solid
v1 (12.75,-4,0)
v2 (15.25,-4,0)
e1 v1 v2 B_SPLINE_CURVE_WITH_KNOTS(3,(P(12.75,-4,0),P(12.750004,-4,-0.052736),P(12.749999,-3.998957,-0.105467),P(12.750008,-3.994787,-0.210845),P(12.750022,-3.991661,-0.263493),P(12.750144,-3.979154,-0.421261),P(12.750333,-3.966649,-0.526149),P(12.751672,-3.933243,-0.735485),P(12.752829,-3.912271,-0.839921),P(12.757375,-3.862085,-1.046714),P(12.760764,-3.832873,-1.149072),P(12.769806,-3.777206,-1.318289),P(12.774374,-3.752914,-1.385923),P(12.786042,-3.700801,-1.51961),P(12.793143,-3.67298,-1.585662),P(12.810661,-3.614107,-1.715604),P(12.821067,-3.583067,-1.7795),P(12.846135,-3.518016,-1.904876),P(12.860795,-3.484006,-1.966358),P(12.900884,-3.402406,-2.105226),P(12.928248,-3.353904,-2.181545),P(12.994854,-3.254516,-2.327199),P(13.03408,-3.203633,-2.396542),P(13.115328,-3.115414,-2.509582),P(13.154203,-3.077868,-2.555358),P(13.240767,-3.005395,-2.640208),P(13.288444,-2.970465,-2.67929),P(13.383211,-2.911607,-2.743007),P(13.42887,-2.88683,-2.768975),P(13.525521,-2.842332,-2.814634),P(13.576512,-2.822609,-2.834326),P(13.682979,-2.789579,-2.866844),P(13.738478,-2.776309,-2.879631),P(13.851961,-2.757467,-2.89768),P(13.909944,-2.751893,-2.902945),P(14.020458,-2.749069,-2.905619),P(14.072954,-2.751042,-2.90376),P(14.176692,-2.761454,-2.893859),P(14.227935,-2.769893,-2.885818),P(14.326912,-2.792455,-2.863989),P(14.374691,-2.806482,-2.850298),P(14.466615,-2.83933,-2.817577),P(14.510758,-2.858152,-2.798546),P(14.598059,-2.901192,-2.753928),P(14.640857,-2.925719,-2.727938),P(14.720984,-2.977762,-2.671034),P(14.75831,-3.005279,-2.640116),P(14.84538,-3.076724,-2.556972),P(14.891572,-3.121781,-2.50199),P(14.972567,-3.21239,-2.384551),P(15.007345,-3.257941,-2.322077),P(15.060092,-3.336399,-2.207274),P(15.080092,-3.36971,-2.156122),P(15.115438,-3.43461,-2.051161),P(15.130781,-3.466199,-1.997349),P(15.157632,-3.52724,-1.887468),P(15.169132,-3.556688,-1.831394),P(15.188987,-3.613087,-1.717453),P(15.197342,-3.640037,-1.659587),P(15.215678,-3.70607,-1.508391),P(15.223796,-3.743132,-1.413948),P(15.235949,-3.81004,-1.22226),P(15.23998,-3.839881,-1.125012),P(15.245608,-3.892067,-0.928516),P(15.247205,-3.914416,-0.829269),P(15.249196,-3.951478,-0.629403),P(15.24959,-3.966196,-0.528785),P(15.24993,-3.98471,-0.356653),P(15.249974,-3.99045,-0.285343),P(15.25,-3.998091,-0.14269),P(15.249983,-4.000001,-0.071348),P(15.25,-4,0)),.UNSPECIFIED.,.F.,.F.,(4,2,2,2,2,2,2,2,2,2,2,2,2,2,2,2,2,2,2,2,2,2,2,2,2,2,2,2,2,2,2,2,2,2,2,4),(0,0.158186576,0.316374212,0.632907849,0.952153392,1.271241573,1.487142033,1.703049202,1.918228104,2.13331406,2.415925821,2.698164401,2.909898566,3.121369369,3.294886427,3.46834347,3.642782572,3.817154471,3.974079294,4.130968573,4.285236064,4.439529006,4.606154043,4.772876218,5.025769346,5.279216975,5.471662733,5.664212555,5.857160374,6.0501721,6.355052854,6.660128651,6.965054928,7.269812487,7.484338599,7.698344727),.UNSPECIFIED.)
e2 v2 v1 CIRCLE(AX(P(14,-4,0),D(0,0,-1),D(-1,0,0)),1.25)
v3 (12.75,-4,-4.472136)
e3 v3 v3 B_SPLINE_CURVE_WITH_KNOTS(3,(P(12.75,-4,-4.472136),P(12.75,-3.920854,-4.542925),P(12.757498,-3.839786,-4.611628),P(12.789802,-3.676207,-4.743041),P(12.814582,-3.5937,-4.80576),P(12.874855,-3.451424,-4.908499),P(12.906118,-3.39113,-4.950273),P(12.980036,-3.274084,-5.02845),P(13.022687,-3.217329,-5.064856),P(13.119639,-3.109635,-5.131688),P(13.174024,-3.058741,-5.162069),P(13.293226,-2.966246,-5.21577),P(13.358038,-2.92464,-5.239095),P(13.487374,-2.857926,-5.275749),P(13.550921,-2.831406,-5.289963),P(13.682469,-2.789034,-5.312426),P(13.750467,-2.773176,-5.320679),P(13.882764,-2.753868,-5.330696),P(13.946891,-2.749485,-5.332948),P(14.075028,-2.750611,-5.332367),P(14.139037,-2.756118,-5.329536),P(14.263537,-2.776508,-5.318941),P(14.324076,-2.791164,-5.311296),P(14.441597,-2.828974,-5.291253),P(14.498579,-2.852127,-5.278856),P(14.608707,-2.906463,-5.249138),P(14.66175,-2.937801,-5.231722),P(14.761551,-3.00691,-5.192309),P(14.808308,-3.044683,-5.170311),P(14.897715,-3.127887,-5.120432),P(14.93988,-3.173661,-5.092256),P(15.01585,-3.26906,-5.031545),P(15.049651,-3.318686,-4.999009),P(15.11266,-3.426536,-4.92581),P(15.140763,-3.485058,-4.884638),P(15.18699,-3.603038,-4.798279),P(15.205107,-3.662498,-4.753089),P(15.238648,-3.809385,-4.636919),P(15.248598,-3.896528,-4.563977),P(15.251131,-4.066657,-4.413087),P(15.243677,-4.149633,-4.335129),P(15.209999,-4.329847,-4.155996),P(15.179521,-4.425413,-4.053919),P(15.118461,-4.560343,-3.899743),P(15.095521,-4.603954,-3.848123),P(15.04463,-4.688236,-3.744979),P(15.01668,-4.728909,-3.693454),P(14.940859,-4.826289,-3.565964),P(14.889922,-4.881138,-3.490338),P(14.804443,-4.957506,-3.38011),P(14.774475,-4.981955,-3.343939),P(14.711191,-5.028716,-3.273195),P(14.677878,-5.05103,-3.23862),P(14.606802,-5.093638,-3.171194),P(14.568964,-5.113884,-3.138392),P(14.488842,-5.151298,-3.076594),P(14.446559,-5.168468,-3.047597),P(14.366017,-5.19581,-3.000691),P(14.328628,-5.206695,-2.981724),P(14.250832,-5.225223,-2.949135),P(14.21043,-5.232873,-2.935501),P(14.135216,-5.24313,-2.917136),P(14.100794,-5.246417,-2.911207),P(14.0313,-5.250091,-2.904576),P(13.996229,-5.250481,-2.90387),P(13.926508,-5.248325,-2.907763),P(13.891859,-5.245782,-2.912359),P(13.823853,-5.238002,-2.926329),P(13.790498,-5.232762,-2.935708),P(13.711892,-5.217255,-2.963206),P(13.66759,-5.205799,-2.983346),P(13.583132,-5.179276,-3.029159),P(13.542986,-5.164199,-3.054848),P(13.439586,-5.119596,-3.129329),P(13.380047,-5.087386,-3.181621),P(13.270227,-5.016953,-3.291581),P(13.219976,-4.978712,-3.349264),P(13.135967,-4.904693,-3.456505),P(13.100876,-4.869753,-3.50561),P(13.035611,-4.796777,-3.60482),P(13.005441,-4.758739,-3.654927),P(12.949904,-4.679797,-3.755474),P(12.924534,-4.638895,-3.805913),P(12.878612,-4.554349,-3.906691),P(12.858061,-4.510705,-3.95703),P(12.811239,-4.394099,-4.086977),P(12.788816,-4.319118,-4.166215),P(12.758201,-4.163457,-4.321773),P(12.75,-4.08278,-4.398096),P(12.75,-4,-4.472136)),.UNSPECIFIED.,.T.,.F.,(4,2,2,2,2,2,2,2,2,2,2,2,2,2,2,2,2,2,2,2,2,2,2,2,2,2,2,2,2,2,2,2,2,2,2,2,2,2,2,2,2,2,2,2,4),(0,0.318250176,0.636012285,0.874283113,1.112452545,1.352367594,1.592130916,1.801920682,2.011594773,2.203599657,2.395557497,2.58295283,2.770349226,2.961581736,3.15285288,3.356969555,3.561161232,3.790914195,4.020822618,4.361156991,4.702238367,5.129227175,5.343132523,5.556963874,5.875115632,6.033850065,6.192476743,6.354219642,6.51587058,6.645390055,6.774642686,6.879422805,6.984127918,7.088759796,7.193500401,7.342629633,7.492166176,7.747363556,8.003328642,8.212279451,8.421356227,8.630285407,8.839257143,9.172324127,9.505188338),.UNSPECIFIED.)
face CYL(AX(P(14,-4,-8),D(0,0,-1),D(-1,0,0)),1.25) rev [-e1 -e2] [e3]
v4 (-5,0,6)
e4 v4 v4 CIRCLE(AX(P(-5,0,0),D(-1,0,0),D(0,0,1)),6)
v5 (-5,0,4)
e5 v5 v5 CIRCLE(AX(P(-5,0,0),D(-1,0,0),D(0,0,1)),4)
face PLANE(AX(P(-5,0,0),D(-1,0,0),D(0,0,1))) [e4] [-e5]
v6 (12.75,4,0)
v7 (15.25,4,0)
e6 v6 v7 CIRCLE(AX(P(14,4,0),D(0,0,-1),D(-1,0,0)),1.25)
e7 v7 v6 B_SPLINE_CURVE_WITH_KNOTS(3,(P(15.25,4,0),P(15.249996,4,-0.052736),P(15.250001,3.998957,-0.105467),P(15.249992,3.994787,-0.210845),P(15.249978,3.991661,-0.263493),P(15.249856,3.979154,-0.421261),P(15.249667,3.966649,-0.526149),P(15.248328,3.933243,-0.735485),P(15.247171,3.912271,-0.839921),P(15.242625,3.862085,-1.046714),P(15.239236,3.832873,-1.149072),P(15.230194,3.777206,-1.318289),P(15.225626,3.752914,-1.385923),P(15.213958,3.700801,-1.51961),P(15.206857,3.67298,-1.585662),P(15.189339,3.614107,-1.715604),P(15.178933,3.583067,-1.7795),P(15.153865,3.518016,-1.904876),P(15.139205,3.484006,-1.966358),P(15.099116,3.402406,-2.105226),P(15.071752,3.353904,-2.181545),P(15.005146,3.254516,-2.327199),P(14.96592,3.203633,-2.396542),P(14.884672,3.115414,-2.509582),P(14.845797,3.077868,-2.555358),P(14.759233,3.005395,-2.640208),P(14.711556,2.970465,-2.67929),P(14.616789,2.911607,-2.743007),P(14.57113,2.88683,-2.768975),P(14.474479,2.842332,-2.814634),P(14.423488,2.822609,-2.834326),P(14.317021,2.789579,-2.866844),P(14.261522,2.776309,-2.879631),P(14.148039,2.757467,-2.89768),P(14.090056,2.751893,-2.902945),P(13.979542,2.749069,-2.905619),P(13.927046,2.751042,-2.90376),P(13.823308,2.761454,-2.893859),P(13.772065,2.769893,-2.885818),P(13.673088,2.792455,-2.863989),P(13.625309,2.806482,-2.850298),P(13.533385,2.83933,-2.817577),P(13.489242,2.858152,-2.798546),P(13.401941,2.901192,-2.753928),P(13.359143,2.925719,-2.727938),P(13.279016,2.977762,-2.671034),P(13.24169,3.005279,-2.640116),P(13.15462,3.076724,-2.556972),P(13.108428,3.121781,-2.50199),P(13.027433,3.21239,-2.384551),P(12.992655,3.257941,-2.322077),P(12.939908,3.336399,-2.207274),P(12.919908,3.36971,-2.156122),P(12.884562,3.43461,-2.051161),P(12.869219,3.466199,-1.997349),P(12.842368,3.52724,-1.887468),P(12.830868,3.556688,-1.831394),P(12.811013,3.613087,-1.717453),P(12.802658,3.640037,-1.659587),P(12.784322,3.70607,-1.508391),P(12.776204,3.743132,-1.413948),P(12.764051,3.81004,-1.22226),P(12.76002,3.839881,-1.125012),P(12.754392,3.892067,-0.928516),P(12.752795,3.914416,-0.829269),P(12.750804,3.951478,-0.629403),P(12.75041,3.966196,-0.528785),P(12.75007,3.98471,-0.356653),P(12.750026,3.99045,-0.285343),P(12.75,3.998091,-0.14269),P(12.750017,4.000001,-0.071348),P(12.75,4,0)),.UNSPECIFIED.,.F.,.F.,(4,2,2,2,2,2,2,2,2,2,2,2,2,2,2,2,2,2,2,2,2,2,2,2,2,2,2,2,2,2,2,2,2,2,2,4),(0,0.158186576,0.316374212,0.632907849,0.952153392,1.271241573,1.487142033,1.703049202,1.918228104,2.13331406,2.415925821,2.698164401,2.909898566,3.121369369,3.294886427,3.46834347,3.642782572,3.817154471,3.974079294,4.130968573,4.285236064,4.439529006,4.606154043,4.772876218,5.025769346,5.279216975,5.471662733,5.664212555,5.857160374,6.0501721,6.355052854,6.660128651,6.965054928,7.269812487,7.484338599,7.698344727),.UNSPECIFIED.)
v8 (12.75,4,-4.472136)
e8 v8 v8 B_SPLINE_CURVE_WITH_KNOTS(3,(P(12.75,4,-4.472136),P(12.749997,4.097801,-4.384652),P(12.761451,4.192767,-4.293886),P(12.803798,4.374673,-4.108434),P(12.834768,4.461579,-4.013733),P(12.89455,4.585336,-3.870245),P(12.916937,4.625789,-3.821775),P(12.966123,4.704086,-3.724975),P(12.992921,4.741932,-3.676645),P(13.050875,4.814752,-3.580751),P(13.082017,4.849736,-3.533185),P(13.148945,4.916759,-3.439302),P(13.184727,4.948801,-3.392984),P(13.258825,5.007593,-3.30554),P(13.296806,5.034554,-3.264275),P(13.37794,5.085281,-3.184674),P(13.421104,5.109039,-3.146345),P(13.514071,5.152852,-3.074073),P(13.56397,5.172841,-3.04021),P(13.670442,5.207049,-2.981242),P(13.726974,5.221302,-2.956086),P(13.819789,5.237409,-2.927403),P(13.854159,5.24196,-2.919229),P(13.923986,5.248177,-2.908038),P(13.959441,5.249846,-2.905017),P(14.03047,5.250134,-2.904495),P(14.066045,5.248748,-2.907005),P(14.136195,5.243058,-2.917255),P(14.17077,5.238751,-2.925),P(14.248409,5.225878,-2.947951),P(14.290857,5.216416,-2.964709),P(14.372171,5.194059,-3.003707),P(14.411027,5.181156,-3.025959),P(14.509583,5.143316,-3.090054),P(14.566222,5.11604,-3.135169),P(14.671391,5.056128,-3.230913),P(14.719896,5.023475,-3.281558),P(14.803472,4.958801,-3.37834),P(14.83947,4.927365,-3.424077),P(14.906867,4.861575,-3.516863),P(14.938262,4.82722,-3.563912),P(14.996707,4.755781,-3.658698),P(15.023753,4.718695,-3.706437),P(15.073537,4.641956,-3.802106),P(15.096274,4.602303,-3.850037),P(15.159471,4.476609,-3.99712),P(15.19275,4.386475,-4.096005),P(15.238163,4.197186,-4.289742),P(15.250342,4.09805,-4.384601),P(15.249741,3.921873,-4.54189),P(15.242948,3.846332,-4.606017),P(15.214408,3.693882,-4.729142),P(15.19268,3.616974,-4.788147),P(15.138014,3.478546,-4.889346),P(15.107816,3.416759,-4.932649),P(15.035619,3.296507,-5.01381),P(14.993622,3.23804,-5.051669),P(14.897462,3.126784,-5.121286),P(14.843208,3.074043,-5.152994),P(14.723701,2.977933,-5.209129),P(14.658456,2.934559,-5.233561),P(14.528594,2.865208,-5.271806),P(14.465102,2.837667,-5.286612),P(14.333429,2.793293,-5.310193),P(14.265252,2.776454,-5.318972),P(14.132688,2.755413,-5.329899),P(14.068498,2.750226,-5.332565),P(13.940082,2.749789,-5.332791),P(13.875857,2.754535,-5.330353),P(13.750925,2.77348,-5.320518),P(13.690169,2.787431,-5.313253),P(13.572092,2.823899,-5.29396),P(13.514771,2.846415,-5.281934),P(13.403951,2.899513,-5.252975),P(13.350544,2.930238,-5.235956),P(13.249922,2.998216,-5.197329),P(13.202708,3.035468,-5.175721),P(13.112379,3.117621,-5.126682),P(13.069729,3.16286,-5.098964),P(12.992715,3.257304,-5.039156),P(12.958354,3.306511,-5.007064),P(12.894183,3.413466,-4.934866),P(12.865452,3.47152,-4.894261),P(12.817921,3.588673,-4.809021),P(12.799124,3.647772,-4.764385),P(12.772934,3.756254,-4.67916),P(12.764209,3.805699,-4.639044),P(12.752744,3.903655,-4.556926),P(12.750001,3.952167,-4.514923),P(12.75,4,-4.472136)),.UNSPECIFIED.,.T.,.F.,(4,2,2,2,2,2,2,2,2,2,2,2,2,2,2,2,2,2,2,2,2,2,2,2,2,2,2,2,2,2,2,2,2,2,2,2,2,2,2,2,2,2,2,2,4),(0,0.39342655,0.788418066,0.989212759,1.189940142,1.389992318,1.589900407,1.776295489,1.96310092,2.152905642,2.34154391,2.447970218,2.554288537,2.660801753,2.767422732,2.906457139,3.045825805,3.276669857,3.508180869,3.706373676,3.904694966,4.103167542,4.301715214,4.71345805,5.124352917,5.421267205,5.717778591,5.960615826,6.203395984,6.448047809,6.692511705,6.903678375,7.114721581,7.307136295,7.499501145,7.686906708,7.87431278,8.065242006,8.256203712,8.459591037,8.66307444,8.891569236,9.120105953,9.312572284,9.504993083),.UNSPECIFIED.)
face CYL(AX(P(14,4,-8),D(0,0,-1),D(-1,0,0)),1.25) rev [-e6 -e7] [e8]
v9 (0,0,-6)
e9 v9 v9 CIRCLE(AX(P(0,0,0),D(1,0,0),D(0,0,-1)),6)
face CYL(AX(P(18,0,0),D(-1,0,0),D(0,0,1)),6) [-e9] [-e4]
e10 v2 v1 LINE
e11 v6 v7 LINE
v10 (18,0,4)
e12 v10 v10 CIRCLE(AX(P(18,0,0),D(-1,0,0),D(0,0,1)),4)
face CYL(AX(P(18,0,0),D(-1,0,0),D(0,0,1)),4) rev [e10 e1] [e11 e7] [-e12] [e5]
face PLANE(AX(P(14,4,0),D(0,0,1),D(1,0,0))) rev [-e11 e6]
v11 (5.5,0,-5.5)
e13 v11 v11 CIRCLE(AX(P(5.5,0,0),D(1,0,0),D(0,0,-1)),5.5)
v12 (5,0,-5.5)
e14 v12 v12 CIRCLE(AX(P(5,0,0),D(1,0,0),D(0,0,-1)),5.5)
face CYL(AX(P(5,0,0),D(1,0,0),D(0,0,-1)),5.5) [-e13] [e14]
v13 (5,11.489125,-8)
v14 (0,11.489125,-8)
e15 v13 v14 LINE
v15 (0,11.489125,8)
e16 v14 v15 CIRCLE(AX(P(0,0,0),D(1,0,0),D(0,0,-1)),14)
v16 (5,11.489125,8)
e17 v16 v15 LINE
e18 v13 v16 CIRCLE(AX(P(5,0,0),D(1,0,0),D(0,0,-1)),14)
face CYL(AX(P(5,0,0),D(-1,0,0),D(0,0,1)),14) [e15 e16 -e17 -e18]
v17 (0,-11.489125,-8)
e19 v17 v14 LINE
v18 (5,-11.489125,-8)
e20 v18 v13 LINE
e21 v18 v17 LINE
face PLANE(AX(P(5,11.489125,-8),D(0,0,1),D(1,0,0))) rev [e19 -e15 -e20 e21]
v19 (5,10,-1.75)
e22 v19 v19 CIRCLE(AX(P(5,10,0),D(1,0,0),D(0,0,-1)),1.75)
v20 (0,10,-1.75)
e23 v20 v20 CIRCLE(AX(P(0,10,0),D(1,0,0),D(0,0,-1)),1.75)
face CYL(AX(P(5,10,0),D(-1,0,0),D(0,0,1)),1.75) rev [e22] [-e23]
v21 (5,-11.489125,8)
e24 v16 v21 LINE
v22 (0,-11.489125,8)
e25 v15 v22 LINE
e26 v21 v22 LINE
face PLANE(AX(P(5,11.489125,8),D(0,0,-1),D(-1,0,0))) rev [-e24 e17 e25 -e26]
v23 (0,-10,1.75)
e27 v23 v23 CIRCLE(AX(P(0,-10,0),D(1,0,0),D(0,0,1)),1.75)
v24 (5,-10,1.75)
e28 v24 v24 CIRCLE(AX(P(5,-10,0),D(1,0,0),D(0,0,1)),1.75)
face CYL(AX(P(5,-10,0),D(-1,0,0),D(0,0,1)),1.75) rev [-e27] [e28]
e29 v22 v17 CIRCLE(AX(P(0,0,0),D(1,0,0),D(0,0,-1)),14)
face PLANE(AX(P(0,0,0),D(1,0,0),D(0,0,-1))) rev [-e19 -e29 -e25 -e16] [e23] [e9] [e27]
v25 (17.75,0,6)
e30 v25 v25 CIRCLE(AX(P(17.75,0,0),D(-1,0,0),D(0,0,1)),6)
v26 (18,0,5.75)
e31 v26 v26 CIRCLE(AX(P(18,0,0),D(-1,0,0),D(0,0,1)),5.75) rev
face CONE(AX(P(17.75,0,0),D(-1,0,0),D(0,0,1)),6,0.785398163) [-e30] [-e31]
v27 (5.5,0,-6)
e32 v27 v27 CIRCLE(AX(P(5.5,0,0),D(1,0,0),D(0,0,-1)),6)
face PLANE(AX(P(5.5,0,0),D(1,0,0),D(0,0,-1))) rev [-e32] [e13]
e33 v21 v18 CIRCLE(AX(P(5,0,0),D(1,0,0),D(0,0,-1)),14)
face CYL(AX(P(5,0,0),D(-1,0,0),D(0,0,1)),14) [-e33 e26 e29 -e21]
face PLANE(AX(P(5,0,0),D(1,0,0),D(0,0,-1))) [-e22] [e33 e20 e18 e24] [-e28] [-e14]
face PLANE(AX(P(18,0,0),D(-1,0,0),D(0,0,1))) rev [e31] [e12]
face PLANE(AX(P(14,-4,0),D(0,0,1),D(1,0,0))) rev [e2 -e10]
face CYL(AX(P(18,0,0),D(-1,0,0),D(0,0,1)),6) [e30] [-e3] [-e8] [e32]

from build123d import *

# Parameters (mm, degrees)
SKETCH_2_R                 = 1.75
EXTRUDE_1_DEPTH            = 5
EXTRUDE_3_DEPTH            = 5
EXTRUDE_3_DEPTH_BACK       = 18
SKETCH_3_R                 = 6
SKETCH_3_R_2               = 4
CUT_EXTRUDE_2_DEPTH        = 25.166091947
CUT_EXTRUDE_2_DEPTH_BACK   = 25.166091947
SKETCH_7_R                 = 4
HOLE_START                 = -5.332682415
HOLE_WIZARD_M3_2_OUTLINE_R = 1.25
HOLE_WIZARD_M3_2_DEPTH     = 5.332682415
CHAMFER_2_SIZE             = 0.25
SKETCH_13_R                = 6
SKETCH_13_R_2              = 5.5
CUT_EXTRUDE_4_DEPTH        = 0.5


# Read off the part's stored shape, not the designer's step: M3 螺纹孔2
with BuildPart() as part:
    # 草图2 → 凸台-拉伸1 (new body)
    with BuildSketch(Plane(origin=(0, 0, 0), x_dir=(0, 0, -1), z_dir=(1, 0, 0))):
        with BuildLine():
            Line((-8, 11.489125293), (-8, -11.489125293))
            ThreePointArc((-8, -11.489125293), (0, -14), (8, -11.489125293))
            Line((8, -11.489125293), (8, 11.489125293))
            ThreePointArc((8, 11.489125293), (0, 14), (-8, 11.489125293))
        make_face()
        with Locations((0, 10)):
            Circle(SKETCH_2_R, mode=Mode.SUBTRACT)
        with Locations(Location((0, -10, 0), (0, 0, 180))):
            Circle(SKETCH_2_R, mode=Mode.SUBTRACT)
    extrude(amount=EXTRUDE_1_DEPTH)

    # 草图3 → 凸台-拉伸3 (add, two sides: drawn at the far end of the back side and taken through both)
    with BuildSketch(Plane.ZY.offset(-EXTRUDE_3_DEPTH_BACK)):
        Circle(SKETCH_3_R)
        Circle(SKETCH_3_R_2, mode=Mode.SUBTRACT)
    extrude(amount=EXTRUDE_3_DEPTH + EXTRUDE_3_DEPTH_BACK)

    # 草图7 → 切除-拉伸2 (cut, two sides: drawn at the far end of the back side and taken through both)
    with BuildSketch(Plane.ZY.offset(-CUT_EXTRUDE_2_DEPTH_BACK)):
        Circle(SKETCH_7_R)
    extrude(amount=CUT_EXTRUDE_2_DEPTH + CUT_EXTRUDE_2_DEPTH_BACK, mode=Mode.SUBTRACT)

    # M3 螺纹孔2 outline → M3 螺纹孔2 (cut)
    with BuildSketch(Plane.XY.offset(HOLE_START)):
        with Locations((14, -4)):
            Circle(HOLE_WIZARD_M3_2_OUTLINE_R)
        with Locations((14, 4)):
            Circle(HOLE_WIZARD_M3_2_OUTLINE_R)
    extrude(amount=HOLE_WIZARD_M3_2_DEPTH, mode=Mode.SUBTRACT)

    # 倒角2
    chamfer_2_edges = [part.edges().sort_by_distance(p)[0] for p in [
        (18, 0, -6),
    ]]
    chamfer(chamfer_2_edges, length=CHAMFER_2_SIZE)

    # 草图13 → 切除-拉伸4 (cut)
    with BuildSketch(Plane(origin=(5.5, 0, 0), x_dir=(0, 0, -1), z_dir=(1, 0, 0))):
        with Locations(Location((0, 0, 0), (0, 0, 180))):
            Circle(SKETCH_13_R)
        Circle(SKETCH_13_R_2, mode=Mode.SUBTRACT)
    extrude(amount=-CUT_EXTRUDE_4_DEPTH, mode=Mode.SUBTRACT)


solid = part.part
